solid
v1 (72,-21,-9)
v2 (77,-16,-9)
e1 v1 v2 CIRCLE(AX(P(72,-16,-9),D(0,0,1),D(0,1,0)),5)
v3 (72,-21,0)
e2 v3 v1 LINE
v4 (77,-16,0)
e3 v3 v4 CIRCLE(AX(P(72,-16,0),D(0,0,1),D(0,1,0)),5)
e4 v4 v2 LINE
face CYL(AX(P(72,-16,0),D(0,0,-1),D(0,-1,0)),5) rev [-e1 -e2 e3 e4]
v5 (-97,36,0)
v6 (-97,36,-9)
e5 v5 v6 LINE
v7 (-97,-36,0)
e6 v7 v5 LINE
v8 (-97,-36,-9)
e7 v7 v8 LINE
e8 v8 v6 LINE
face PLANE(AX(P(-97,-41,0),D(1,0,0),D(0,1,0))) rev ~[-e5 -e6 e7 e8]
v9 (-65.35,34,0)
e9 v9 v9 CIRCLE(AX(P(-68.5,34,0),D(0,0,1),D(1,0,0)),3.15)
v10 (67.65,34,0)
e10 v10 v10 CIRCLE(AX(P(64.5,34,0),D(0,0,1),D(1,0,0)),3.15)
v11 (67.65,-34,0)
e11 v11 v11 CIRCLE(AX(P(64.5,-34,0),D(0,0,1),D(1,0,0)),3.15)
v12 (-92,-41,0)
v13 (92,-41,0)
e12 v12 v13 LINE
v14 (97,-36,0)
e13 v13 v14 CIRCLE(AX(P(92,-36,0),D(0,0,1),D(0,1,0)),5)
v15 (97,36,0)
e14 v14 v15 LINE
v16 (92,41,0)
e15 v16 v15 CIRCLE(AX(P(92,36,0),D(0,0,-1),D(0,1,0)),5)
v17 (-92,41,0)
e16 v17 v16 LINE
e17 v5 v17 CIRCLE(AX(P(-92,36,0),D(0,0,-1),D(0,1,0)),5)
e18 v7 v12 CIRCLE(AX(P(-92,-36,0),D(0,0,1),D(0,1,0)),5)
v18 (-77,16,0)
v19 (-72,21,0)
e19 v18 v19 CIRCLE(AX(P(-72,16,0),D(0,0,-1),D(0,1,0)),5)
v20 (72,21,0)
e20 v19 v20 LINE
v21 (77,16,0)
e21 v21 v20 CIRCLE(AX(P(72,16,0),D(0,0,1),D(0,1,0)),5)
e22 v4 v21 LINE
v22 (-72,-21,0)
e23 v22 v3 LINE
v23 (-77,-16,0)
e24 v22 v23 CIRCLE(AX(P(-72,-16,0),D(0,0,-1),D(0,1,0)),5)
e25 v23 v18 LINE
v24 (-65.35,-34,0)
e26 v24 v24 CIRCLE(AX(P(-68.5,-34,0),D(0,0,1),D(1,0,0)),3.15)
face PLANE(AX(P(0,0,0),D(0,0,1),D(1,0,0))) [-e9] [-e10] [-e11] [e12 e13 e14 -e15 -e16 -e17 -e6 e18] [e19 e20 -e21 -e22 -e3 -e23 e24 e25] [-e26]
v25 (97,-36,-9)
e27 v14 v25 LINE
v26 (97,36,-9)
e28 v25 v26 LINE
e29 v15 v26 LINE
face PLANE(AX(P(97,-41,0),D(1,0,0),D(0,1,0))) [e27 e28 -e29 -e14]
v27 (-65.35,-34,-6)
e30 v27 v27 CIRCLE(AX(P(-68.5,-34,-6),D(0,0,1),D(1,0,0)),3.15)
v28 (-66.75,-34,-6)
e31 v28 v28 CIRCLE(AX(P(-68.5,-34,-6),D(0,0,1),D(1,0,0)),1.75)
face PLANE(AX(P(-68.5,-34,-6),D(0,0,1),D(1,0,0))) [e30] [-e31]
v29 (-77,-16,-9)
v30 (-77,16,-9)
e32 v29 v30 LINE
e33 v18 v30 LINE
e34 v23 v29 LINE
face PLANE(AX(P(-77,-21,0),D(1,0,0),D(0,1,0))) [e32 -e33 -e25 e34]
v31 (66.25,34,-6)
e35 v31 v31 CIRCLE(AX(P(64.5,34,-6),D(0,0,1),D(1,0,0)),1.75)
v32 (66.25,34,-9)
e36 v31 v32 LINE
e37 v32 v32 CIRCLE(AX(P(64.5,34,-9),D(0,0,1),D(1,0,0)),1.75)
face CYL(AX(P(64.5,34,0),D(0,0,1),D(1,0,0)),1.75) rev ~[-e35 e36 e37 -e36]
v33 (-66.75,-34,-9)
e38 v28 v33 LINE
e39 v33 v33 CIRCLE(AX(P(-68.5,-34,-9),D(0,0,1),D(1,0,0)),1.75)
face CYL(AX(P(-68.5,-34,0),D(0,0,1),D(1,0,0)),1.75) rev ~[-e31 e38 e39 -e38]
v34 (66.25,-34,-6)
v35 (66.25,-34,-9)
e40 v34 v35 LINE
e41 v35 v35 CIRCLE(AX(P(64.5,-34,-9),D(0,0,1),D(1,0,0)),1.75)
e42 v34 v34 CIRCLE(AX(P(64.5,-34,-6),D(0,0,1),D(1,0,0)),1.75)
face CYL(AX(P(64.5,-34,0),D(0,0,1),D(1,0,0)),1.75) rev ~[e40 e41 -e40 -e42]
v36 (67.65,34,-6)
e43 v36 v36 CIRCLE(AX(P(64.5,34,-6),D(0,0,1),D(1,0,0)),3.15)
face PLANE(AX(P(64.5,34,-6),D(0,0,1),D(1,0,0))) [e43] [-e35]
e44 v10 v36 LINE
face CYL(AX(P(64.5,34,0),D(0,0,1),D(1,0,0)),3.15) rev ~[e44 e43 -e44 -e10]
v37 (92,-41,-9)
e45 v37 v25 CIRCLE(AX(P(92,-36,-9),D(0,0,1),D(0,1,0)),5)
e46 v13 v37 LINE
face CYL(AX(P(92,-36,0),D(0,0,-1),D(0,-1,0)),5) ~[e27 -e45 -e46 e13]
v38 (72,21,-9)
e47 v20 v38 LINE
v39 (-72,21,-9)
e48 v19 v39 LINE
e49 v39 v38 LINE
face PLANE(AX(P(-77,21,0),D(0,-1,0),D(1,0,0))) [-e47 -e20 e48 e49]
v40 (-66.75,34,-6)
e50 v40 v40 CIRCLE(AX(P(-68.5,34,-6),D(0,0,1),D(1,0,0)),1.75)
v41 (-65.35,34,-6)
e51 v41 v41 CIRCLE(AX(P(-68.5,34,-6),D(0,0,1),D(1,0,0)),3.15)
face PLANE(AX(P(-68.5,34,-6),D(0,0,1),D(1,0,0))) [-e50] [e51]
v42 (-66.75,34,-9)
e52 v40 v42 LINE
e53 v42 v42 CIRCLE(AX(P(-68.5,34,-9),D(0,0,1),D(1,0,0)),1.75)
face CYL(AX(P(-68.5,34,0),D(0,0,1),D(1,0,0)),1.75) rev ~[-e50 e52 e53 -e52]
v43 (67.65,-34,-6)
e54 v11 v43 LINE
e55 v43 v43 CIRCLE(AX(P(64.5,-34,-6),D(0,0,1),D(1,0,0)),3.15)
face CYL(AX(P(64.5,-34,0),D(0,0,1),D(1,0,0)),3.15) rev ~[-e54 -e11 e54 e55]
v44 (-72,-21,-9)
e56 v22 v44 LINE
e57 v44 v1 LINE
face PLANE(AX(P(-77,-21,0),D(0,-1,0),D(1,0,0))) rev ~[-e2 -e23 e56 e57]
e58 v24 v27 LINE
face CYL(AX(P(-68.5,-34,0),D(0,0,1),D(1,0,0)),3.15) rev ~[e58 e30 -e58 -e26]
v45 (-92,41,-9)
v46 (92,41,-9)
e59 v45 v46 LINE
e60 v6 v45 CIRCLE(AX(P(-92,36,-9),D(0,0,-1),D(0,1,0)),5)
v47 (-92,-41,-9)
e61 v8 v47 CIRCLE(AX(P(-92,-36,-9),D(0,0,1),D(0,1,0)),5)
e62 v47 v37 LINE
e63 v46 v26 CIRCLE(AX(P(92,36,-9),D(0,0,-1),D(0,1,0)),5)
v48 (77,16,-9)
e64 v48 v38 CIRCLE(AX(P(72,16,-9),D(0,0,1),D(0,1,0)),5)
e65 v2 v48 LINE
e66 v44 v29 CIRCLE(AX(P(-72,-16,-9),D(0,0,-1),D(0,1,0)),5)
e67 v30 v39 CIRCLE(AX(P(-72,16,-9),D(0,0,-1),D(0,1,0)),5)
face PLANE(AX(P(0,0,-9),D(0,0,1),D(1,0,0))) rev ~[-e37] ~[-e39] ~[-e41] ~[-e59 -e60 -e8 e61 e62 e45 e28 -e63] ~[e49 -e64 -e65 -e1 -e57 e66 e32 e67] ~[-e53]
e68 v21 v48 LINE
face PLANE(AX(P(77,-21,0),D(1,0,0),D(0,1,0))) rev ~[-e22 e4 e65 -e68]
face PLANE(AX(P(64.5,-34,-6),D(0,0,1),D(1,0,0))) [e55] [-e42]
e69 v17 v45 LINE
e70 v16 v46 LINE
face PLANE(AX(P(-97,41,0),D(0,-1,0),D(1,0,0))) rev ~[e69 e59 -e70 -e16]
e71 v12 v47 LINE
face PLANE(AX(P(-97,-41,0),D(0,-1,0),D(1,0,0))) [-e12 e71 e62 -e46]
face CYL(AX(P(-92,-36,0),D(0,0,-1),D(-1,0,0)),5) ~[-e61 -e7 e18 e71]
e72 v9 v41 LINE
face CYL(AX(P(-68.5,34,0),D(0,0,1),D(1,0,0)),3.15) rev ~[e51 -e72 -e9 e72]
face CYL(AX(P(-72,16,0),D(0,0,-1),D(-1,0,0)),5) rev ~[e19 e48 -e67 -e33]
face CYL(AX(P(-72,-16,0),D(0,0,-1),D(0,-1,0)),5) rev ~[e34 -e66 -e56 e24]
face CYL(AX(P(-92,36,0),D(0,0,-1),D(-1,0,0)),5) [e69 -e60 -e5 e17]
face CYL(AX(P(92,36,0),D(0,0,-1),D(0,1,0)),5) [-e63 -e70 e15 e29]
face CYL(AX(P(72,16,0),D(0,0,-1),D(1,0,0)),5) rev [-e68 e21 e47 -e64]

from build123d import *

# Parameters (mm, degrees)
F0_W     = 194
F0_H     = 82
F0_R     = 3.15
F0_W_2   = 154
F0_H_2   = 42
F0_R_2   = 1.75
F1_DEPTH = 9
F2_DEPTH = 6
F3_R     = 5


# Not quite as in the source:
# - a feature names something its author has since deleted; it is built from what else it names


with BuildPart() as f1:
    # F0 (on Top) → F1 (new body)
    with BuildSketch(Plane.XY):
        Rectangle(F0_W, F0_H)
        with Locations((-68.5, -34)):
            Circle(F0_R, mode=Mode.SUBTRACT)
        with Locations((64.5, -34)):
            Circle(F0_R, mode=Mode.SUBTRACT)
        with Locations((-68.5, 34)):
            Circle(F0_R, mode=Mode.SUBTRACT)
        Rectangle(F0_W_2, F0_H_2, mode=Mode.SUBTRACT)
        with Locations((64.5, 34)):
            Circle(F0_R, mode=Mode.SUBTRACT)
        with Locations((-68.5, 34)):
            Circle(F0_R)
        with Locations((-68.5, 34)):
            Circle(F0_R_2, mode=Mode.SUBTRACT)
        with Locations((-68.5, -34)):
            Circle(F0_R)
        with Locations((-68.5, -34)):
            Circle(F0_R_2, mode=Mode.SUBTRACT)
        with Locations((64.5, 34)):
            Circle(F0_R)
        with Locations((64.5, 34)):
            Circle(F0_R_2, mode=Mode.SUBTRACT)
        with Locations((64.5, -34)):
            Circle(F0_R)
        with Locations((64.5, -34)):
            Circle(F0_R_2, mode=Mode.SUBTRACT)
    extrude(amount=-F1_DEPTH)

    # F0 (on Top) → F2 (cut)
    with BuildSketch(Plane.XY):
        with Locations((-68.5, 34)):
            Circle(F0_R)
        with Locations((-68.5, 34)):
            Circle(F0_R_2, mode=Mode.SUBTRACT)
        with Locations((-68.5, -34)):
            Circle(F0_R)
        with Locations((-68.5, -34)):
            Circle(F0_R_2, mode=Mode.SUBTRACT)
        with Locations((64.5, 34)):
            Circle(F0_R)
        with Locations((64.5, 34)):
            Circle(F0_R_2, mode=Mode.SUBTRACT)
        with Locations((64.5, -34)):
            Circle(F0_R)
        with Locations((64.5, -34)):
            Circle(F0_R_2, mode=Mode.SUBTRACT)
    extrude(amount=-F2_DEPTH, mode=Mode.SUBTRACT)

    # F3
    f3_edges = [f1.edges().sort_by_distance(p)[0] for p in [
        (97, 41, -4.5),
        (-97, 41, -4.5),
        (-97, -41, -4.5),
        (97, -41, -4.5),
        (-77, 21, -4.5),
        (77, 21, -4.5),
        (77, -21, -4.5),
        (-77, -21, -4.5),
    ]]
    fillet(f3_edges, radius=F3_R)


solid = f1.part
